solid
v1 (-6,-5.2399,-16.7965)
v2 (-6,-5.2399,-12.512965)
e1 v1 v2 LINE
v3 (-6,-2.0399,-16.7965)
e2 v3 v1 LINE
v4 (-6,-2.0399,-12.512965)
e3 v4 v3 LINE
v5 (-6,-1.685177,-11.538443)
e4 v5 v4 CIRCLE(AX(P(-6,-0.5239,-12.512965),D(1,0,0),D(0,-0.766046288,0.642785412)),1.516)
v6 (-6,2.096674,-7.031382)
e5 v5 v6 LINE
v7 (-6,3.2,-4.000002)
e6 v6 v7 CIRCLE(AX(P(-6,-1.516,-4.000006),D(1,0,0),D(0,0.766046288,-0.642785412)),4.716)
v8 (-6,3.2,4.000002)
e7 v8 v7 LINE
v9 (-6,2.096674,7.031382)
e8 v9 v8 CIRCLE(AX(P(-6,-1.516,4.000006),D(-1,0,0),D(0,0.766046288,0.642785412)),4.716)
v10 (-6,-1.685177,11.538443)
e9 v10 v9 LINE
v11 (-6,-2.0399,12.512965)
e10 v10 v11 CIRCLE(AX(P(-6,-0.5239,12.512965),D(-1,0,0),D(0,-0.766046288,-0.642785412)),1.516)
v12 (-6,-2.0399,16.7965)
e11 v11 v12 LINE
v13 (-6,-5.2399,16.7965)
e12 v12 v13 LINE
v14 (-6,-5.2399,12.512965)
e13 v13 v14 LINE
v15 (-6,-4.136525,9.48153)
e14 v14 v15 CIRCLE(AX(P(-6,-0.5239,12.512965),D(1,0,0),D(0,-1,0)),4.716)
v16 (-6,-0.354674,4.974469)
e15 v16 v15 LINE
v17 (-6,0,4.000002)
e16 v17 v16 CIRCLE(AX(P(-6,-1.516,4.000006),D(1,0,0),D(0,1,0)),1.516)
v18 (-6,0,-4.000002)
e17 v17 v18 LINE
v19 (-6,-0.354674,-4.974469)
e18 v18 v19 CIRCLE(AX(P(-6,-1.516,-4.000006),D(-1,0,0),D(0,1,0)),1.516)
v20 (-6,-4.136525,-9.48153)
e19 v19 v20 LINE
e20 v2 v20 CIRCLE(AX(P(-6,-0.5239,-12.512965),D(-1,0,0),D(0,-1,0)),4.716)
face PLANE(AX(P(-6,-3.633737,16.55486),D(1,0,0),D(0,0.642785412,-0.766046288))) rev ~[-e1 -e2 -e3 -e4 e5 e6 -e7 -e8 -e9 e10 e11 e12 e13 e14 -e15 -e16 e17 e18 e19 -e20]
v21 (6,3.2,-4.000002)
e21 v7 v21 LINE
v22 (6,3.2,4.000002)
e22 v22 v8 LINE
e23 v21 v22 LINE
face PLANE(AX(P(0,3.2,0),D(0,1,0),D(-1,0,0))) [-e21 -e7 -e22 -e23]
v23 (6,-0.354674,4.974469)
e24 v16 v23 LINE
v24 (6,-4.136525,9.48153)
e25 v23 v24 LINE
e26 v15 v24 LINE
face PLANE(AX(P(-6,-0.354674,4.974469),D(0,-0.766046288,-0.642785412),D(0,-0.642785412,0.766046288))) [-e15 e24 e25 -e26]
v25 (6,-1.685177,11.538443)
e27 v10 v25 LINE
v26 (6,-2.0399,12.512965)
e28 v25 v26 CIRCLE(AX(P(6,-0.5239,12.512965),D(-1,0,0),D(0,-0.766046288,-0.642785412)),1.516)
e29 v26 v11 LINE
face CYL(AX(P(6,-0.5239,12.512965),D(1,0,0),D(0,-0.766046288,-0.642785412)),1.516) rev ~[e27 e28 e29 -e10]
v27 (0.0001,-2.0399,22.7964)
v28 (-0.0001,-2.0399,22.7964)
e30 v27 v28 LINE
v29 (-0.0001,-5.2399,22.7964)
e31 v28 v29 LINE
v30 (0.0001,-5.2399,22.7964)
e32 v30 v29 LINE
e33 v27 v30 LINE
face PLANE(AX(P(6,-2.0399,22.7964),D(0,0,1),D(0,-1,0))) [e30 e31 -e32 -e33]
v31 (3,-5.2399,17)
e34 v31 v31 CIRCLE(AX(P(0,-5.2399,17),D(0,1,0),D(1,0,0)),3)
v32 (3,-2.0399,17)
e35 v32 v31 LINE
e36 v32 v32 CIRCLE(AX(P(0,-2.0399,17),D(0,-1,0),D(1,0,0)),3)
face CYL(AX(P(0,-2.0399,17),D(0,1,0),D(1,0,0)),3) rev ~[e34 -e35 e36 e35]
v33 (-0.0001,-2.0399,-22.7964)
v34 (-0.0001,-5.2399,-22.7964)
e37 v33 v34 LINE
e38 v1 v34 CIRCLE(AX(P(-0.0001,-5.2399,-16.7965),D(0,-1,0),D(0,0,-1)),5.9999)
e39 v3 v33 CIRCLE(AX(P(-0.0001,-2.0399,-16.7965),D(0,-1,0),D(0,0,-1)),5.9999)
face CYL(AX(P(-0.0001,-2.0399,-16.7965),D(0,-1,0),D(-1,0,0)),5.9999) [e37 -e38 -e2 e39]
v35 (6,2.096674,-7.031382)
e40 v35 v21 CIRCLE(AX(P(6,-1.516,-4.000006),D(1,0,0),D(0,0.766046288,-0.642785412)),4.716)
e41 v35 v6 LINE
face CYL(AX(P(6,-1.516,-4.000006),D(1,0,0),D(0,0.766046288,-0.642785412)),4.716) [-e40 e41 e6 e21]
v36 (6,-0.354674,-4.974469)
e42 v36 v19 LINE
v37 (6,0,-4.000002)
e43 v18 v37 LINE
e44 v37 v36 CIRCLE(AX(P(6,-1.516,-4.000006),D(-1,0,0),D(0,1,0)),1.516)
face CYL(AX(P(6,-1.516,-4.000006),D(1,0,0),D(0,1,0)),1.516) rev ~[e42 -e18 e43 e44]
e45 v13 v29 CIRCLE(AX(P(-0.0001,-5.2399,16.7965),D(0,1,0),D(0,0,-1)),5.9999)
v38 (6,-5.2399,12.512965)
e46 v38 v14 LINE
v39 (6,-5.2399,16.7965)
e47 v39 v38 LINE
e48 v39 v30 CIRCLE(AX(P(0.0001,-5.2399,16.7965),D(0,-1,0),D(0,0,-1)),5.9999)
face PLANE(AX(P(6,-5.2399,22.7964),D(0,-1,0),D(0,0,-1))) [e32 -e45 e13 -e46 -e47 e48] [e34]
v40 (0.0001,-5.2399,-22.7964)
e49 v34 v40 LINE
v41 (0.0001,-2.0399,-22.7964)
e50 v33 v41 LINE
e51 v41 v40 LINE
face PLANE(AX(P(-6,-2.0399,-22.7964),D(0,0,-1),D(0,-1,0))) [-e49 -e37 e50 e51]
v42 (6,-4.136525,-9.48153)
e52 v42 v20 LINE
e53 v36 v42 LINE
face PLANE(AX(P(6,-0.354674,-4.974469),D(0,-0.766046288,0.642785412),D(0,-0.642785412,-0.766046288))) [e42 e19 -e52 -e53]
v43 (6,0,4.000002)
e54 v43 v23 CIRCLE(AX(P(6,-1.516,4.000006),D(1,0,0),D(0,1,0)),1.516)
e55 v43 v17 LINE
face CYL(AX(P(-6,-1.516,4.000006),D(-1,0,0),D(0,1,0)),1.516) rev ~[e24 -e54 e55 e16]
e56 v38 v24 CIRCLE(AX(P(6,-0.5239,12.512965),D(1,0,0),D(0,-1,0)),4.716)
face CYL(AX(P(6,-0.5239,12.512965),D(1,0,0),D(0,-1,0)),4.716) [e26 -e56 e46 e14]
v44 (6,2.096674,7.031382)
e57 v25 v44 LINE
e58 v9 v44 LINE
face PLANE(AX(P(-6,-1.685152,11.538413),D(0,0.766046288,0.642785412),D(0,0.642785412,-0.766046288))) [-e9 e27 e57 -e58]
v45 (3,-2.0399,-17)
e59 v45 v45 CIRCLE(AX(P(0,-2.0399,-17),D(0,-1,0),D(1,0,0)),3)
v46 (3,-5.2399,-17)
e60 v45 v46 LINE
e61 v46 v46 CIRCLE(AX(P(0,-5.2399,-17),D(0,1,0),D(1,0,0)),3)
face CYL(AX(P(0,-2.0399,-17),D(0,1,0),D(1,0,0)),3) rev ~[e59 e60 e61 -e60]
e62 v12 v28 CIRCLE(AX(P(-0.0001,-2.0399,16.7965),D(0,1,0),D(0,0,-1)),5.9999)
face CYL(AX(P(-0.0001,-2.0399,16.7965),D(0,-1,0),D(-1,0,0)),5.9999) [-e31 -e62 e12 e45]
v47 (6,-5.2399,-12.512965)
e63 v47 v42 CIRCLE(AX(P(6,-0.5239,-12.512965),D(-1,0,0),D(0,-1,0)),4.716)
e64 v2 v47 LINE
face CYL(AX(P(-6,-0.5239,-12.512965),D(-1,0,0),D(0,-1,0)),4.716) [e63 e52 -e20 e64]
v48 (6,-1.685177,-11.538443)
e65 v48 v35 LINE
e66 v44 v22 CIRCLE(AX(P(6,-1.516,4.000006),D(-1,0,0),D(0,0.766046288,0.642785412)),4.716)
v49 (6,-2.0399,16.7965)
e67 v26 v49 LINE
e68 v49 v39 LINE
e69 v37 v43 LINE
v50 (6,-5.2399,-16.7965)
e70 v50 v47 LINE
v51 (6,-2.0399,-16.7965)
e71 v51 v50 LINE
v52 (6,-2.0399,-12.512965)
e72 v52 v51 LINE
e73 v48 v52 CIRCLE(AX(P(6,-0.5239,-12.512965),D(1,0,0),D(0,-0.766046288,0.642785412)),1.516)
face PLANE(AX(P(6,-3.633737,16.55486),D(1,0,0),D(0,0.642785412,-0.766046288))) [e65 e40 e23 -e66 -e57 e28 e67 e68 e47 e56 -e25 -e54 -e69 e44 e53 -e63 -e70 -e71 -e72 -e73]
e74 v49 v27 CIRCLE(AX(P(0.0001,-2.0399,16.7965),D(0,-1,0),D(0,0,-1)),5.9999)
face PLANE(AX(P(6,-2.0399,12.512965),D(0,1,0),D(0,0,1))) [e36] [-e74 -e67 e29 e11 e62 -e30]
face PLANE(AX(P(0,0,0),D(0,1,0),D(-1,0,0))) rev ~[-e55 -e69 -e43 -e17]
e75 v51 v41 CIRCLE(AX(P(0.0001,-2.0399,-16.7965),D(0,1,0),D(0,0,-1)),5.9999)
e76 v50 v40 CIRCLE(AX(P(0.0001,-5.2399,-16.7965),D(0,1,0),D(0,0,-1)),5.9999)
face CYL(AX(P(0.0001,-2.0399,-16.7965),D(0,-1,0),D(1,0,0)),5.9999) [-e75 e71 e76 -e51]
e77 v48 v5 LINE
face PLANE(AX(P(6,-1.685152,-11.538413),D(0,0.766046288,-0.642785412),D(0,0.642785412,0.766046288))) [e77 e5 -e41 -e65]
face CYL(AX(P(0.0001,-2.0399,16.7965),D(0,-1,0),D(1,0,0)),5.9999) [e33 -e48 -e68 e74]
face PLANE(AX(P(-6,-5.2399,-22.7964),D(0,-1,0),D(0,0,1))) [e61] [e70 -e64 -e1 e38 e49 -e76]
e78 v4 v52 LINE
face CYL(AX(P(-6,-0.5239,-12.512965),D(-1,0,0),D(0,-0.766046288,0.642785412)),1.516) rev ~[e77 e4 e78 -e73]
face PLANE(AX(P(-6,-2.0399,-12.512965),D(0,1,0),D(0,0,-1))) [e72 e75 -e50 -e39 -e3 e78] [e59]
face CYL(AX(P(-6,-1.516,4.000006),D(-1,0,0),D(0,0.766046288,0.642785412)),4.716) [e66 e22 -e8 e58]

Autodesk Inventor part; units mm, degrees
ref_plane "YZ Plane" through (0, 0, 0) normal (1, 0, 0) x (0, 1, 0)
ref_plane "XZ Plane" through (0, 0, 0) normal (0, 1, 0) x (-1, 0, 0)
ref_plane "XY Plane" through (0, 0, 0) normal (0, 0, 1) x (1, 0, 0)
sketch "Sketch1" plane through (0, 0, 0) normal (0, 1, 0) x (-1, 0, 0)
  line L0 (-6, 4) -> (6, 4)
  line L1 (6, 4) -> (6, -4)
  line L2 (6, -4) -> (-6, -4)
  line L3 (-6, -4) -> (-6, 4)
  line L4 (-6, 4) -> (6, -4) construction
  line L5 (6, 4) -> (-6, -4) construction
  point P0 (0, 0)
  dimension "d0" = 12
  dimension "d1" = 8
extrude "Plate1" add sketch "Sketch1" along normal blind 3.2
sketch "Sketch2" plane through (-6, -0.3547, -4.9745) normal (0, 0.7660444, -0.6427876) x (1, 0, 0)
  line L0 (12, 0) -> (0, 0)
  line L1 (0, 0) -> (0, -5.8835)
  line L2 (0, -5.8835) -> (12, -5.8835)
  line L3 (12, -5.8835) -> (12, 0)
edge flange "Flange1" height 7.6 angle 40 thickness 3.2 bend radius 1.516 thickness toward (0, 0.7660444, -0.6427876) relief tear relief width 3.2 relief depth 1.6 edges at (0, 3.2, -4) wall of the first edge with corners at (6, -0.3547, -4.9745) (-6, -0.3547, -4.9745) (-6, -4.1365, -9.4815) (6, -4.1365, -9.4815)
bend "Bend1"
corner "Corner1"
sketch "Sketch3" plane through (6, -2.0399, -12.5129) normal (0, -1, 0) x (-1, 0, 0)
  line L0 (12, 0) -> (0, 0)
  line L1 (0, 0) -> (0, -10.2835)
  line L2 (0, -10.2835) -> (12, -10.2835)
  line L3 (12, -10.2835) -> (12, 0)
edge flange "Flange2" height 12 angle 40 thickness 3.2 bend radius 1.516 thickness toward (0, -1, 0) relief tear relief width 3.2 relief depth 1.6 edges at (0, -4.1365, -9.4815) wall of the first edge with corners at (-6, -2.0399, -12.5129) (6, -2.0399, -12.5129) (6, -2.0399, -22.7964) (-6, -2.0399, -22.7964)
bend "Bend2"
corner "Corner2"
sketch "Sketch4" plane through (6, -0.3547, 4.9745) normal (0, 0.7660444, 0.6427876) x (1, 0, 0)
  line L0 (-12, 0) -> (0, 0)
  line L1 (0, 0) -> (0, 5.8835)
  line L2 (0, 5.8835) -> (-12, 5.8835)
  line L3 (-12, 5.8835) -> (-12, 0)
edge flange "Flange3" height 7.6 angle 40 thickness 3.2 bend radius 1.516 thickness toward (0, 0.7660444, 0.6427876) relief tear relief width 3.2 relief depth 1.6 edges at (0, 3.2, 4) wall of the first edge with corners at (-6, -0.3547, 4.9745) (6, -0.3547, 4.9745) (6, -4.1365, 9.4815) (-6, -4.1365, 9.4815)
bend "Bend3"
corner "Corner3"
sketch "Sketch5" plane through (-6, -2.0399, 12.5129) normal (0, -1, 0) x (-1, 0, 0)
  line L0 (-12, 0) -> (0, 0)
  line L1 (0, 0) -> (0, 10.2835)
  line L2 (0, 10.2835) -> (-12, 10.2835)
  line L3 (-12, 10.2835) -> (-12, 0)
edge flange "Flange4" height 12 angle 40 thickness 3.2 bend radius 1.516 thickness toward (0, -1, 0) relief tear relief width 3.2 relief depth 1.6 edges at (0, -4.1365, 9.4815) wall of the first edge with corners at (6, -2.0399, 12.5129) (-6, -2.0399, 12.5129) (-6, -2.0399, 22.7964) (6, -2.0399, 22.7964)
bend "Bend4"
corner "Corner4"
fillet "Fillet1" radius 6 4 edges at (6, -3.6399, -22.7964) (-6, -3.6399, -22.7964) (6, -3.6399, 22.7964) (-6, -3.6399, 22.7964)
sketch "Sketch6" plane through (-6, -2.0399, 12.5129) normal (0, 1, 0) x (1, 0, 0)
  arc A0 (0, -4.2835) -> (12, -4.2835) centre (6, -4.2835) ccw projected
  line L0 (6, -10.2835) -> (6, 35.3093)
  arc A1 (12, 29.3093) -> (0, 29.3093) centre (6, 29.3093) ccw projected
  line L1 (6, 12.5129) -> (6, -4.4871)
  circle A2 centre (6, -4.4871) radius 3
  line L2 (6, 12.5129) -> (6, 29.5129)
  circle A3 centre (6, 29.5129) radius 3
  dimension "d50" = 17
  dimension "d51" = 6
  dimension "d52" = 17
  dimension "d53" = 6
extrude "Cut1" cut sketch "Sketch6" against normal blind 3.2
equation "\"d54\" = Thickness"
equation "\"d2\" = Thickness"
equation "\"d3\" = BendReliefWidth"
equation "\"d4\" = BendReliefDepth"
equation "\"d5\" = MinimumRemnant"
equation "\"d6\" = TransitionRadius"
equation "\"d9\" = BendRadius"
equation "\"d10\" = CornerReliefSize"
equation "\"d11\" = GapSize"
equation "\"d12\" = JacobiRadiusSize"
equation "\"d13\" = BendReliefWidth"
equation "\"d14\" = BendReliefDepth"
equation "\"d15\" = MinimumRemnant"
equation "\"d16\" = TransitionRadius"
equation "\"d19\" = BendRadius"
equation "\"d20\" = CornerReliefSize"
equation "\"d21\" = GapSize"
equation "\"d22\" = JacobiRadiusSize"
equation "\"d23\" = BendReliefWidth"
equation "\"d24\" = BendReliefDepth"
equation "\"d25\" = MinimumRemnant"
equation "\"d26\" = TransitionRadius"
equation "\"d29\" = BendRadius"
equation "\"d30\" = CornerReliefSize"
equation "\"d31\" = GapSize"
equation "\"d32\" = JacobiRadiusSize"
equation "\"d33\" = BendReliefWidth"
equation "\"d34\" = BendReliefDepth"
equation "\"d35\" = MinimumRemnant"
equation "\"d36\" = TransitionRadius"
equation "\"d39\" = BendRadius"
equation "\"d40\" = CornerReliefSize"
equation "\"d41\" = GapSize"
equation "\"d42\" = JacobiRadiusSize"
equation "\"BendReliefWidth\" = Thickness"
equation "\"BendReliefDepth\" = 0.5 * Thickness"
equation "\"CornerReliefSize\" = 4 * Thickness"
equation "\"MinimumRemnant\" = 2 * Thickness"
equation "\"TransitionRadius\" = BendRadius"
equation "\"JacobiRadiusSize\" = BendRadius"
equation "\"GapSize\" = Thickness"
equation "\"Thickness\" = 3.2"
equation "\"BendRadius\" = 1.516"
properties part number "SP7V1 Viela Freno" material "Stainless Steel"
